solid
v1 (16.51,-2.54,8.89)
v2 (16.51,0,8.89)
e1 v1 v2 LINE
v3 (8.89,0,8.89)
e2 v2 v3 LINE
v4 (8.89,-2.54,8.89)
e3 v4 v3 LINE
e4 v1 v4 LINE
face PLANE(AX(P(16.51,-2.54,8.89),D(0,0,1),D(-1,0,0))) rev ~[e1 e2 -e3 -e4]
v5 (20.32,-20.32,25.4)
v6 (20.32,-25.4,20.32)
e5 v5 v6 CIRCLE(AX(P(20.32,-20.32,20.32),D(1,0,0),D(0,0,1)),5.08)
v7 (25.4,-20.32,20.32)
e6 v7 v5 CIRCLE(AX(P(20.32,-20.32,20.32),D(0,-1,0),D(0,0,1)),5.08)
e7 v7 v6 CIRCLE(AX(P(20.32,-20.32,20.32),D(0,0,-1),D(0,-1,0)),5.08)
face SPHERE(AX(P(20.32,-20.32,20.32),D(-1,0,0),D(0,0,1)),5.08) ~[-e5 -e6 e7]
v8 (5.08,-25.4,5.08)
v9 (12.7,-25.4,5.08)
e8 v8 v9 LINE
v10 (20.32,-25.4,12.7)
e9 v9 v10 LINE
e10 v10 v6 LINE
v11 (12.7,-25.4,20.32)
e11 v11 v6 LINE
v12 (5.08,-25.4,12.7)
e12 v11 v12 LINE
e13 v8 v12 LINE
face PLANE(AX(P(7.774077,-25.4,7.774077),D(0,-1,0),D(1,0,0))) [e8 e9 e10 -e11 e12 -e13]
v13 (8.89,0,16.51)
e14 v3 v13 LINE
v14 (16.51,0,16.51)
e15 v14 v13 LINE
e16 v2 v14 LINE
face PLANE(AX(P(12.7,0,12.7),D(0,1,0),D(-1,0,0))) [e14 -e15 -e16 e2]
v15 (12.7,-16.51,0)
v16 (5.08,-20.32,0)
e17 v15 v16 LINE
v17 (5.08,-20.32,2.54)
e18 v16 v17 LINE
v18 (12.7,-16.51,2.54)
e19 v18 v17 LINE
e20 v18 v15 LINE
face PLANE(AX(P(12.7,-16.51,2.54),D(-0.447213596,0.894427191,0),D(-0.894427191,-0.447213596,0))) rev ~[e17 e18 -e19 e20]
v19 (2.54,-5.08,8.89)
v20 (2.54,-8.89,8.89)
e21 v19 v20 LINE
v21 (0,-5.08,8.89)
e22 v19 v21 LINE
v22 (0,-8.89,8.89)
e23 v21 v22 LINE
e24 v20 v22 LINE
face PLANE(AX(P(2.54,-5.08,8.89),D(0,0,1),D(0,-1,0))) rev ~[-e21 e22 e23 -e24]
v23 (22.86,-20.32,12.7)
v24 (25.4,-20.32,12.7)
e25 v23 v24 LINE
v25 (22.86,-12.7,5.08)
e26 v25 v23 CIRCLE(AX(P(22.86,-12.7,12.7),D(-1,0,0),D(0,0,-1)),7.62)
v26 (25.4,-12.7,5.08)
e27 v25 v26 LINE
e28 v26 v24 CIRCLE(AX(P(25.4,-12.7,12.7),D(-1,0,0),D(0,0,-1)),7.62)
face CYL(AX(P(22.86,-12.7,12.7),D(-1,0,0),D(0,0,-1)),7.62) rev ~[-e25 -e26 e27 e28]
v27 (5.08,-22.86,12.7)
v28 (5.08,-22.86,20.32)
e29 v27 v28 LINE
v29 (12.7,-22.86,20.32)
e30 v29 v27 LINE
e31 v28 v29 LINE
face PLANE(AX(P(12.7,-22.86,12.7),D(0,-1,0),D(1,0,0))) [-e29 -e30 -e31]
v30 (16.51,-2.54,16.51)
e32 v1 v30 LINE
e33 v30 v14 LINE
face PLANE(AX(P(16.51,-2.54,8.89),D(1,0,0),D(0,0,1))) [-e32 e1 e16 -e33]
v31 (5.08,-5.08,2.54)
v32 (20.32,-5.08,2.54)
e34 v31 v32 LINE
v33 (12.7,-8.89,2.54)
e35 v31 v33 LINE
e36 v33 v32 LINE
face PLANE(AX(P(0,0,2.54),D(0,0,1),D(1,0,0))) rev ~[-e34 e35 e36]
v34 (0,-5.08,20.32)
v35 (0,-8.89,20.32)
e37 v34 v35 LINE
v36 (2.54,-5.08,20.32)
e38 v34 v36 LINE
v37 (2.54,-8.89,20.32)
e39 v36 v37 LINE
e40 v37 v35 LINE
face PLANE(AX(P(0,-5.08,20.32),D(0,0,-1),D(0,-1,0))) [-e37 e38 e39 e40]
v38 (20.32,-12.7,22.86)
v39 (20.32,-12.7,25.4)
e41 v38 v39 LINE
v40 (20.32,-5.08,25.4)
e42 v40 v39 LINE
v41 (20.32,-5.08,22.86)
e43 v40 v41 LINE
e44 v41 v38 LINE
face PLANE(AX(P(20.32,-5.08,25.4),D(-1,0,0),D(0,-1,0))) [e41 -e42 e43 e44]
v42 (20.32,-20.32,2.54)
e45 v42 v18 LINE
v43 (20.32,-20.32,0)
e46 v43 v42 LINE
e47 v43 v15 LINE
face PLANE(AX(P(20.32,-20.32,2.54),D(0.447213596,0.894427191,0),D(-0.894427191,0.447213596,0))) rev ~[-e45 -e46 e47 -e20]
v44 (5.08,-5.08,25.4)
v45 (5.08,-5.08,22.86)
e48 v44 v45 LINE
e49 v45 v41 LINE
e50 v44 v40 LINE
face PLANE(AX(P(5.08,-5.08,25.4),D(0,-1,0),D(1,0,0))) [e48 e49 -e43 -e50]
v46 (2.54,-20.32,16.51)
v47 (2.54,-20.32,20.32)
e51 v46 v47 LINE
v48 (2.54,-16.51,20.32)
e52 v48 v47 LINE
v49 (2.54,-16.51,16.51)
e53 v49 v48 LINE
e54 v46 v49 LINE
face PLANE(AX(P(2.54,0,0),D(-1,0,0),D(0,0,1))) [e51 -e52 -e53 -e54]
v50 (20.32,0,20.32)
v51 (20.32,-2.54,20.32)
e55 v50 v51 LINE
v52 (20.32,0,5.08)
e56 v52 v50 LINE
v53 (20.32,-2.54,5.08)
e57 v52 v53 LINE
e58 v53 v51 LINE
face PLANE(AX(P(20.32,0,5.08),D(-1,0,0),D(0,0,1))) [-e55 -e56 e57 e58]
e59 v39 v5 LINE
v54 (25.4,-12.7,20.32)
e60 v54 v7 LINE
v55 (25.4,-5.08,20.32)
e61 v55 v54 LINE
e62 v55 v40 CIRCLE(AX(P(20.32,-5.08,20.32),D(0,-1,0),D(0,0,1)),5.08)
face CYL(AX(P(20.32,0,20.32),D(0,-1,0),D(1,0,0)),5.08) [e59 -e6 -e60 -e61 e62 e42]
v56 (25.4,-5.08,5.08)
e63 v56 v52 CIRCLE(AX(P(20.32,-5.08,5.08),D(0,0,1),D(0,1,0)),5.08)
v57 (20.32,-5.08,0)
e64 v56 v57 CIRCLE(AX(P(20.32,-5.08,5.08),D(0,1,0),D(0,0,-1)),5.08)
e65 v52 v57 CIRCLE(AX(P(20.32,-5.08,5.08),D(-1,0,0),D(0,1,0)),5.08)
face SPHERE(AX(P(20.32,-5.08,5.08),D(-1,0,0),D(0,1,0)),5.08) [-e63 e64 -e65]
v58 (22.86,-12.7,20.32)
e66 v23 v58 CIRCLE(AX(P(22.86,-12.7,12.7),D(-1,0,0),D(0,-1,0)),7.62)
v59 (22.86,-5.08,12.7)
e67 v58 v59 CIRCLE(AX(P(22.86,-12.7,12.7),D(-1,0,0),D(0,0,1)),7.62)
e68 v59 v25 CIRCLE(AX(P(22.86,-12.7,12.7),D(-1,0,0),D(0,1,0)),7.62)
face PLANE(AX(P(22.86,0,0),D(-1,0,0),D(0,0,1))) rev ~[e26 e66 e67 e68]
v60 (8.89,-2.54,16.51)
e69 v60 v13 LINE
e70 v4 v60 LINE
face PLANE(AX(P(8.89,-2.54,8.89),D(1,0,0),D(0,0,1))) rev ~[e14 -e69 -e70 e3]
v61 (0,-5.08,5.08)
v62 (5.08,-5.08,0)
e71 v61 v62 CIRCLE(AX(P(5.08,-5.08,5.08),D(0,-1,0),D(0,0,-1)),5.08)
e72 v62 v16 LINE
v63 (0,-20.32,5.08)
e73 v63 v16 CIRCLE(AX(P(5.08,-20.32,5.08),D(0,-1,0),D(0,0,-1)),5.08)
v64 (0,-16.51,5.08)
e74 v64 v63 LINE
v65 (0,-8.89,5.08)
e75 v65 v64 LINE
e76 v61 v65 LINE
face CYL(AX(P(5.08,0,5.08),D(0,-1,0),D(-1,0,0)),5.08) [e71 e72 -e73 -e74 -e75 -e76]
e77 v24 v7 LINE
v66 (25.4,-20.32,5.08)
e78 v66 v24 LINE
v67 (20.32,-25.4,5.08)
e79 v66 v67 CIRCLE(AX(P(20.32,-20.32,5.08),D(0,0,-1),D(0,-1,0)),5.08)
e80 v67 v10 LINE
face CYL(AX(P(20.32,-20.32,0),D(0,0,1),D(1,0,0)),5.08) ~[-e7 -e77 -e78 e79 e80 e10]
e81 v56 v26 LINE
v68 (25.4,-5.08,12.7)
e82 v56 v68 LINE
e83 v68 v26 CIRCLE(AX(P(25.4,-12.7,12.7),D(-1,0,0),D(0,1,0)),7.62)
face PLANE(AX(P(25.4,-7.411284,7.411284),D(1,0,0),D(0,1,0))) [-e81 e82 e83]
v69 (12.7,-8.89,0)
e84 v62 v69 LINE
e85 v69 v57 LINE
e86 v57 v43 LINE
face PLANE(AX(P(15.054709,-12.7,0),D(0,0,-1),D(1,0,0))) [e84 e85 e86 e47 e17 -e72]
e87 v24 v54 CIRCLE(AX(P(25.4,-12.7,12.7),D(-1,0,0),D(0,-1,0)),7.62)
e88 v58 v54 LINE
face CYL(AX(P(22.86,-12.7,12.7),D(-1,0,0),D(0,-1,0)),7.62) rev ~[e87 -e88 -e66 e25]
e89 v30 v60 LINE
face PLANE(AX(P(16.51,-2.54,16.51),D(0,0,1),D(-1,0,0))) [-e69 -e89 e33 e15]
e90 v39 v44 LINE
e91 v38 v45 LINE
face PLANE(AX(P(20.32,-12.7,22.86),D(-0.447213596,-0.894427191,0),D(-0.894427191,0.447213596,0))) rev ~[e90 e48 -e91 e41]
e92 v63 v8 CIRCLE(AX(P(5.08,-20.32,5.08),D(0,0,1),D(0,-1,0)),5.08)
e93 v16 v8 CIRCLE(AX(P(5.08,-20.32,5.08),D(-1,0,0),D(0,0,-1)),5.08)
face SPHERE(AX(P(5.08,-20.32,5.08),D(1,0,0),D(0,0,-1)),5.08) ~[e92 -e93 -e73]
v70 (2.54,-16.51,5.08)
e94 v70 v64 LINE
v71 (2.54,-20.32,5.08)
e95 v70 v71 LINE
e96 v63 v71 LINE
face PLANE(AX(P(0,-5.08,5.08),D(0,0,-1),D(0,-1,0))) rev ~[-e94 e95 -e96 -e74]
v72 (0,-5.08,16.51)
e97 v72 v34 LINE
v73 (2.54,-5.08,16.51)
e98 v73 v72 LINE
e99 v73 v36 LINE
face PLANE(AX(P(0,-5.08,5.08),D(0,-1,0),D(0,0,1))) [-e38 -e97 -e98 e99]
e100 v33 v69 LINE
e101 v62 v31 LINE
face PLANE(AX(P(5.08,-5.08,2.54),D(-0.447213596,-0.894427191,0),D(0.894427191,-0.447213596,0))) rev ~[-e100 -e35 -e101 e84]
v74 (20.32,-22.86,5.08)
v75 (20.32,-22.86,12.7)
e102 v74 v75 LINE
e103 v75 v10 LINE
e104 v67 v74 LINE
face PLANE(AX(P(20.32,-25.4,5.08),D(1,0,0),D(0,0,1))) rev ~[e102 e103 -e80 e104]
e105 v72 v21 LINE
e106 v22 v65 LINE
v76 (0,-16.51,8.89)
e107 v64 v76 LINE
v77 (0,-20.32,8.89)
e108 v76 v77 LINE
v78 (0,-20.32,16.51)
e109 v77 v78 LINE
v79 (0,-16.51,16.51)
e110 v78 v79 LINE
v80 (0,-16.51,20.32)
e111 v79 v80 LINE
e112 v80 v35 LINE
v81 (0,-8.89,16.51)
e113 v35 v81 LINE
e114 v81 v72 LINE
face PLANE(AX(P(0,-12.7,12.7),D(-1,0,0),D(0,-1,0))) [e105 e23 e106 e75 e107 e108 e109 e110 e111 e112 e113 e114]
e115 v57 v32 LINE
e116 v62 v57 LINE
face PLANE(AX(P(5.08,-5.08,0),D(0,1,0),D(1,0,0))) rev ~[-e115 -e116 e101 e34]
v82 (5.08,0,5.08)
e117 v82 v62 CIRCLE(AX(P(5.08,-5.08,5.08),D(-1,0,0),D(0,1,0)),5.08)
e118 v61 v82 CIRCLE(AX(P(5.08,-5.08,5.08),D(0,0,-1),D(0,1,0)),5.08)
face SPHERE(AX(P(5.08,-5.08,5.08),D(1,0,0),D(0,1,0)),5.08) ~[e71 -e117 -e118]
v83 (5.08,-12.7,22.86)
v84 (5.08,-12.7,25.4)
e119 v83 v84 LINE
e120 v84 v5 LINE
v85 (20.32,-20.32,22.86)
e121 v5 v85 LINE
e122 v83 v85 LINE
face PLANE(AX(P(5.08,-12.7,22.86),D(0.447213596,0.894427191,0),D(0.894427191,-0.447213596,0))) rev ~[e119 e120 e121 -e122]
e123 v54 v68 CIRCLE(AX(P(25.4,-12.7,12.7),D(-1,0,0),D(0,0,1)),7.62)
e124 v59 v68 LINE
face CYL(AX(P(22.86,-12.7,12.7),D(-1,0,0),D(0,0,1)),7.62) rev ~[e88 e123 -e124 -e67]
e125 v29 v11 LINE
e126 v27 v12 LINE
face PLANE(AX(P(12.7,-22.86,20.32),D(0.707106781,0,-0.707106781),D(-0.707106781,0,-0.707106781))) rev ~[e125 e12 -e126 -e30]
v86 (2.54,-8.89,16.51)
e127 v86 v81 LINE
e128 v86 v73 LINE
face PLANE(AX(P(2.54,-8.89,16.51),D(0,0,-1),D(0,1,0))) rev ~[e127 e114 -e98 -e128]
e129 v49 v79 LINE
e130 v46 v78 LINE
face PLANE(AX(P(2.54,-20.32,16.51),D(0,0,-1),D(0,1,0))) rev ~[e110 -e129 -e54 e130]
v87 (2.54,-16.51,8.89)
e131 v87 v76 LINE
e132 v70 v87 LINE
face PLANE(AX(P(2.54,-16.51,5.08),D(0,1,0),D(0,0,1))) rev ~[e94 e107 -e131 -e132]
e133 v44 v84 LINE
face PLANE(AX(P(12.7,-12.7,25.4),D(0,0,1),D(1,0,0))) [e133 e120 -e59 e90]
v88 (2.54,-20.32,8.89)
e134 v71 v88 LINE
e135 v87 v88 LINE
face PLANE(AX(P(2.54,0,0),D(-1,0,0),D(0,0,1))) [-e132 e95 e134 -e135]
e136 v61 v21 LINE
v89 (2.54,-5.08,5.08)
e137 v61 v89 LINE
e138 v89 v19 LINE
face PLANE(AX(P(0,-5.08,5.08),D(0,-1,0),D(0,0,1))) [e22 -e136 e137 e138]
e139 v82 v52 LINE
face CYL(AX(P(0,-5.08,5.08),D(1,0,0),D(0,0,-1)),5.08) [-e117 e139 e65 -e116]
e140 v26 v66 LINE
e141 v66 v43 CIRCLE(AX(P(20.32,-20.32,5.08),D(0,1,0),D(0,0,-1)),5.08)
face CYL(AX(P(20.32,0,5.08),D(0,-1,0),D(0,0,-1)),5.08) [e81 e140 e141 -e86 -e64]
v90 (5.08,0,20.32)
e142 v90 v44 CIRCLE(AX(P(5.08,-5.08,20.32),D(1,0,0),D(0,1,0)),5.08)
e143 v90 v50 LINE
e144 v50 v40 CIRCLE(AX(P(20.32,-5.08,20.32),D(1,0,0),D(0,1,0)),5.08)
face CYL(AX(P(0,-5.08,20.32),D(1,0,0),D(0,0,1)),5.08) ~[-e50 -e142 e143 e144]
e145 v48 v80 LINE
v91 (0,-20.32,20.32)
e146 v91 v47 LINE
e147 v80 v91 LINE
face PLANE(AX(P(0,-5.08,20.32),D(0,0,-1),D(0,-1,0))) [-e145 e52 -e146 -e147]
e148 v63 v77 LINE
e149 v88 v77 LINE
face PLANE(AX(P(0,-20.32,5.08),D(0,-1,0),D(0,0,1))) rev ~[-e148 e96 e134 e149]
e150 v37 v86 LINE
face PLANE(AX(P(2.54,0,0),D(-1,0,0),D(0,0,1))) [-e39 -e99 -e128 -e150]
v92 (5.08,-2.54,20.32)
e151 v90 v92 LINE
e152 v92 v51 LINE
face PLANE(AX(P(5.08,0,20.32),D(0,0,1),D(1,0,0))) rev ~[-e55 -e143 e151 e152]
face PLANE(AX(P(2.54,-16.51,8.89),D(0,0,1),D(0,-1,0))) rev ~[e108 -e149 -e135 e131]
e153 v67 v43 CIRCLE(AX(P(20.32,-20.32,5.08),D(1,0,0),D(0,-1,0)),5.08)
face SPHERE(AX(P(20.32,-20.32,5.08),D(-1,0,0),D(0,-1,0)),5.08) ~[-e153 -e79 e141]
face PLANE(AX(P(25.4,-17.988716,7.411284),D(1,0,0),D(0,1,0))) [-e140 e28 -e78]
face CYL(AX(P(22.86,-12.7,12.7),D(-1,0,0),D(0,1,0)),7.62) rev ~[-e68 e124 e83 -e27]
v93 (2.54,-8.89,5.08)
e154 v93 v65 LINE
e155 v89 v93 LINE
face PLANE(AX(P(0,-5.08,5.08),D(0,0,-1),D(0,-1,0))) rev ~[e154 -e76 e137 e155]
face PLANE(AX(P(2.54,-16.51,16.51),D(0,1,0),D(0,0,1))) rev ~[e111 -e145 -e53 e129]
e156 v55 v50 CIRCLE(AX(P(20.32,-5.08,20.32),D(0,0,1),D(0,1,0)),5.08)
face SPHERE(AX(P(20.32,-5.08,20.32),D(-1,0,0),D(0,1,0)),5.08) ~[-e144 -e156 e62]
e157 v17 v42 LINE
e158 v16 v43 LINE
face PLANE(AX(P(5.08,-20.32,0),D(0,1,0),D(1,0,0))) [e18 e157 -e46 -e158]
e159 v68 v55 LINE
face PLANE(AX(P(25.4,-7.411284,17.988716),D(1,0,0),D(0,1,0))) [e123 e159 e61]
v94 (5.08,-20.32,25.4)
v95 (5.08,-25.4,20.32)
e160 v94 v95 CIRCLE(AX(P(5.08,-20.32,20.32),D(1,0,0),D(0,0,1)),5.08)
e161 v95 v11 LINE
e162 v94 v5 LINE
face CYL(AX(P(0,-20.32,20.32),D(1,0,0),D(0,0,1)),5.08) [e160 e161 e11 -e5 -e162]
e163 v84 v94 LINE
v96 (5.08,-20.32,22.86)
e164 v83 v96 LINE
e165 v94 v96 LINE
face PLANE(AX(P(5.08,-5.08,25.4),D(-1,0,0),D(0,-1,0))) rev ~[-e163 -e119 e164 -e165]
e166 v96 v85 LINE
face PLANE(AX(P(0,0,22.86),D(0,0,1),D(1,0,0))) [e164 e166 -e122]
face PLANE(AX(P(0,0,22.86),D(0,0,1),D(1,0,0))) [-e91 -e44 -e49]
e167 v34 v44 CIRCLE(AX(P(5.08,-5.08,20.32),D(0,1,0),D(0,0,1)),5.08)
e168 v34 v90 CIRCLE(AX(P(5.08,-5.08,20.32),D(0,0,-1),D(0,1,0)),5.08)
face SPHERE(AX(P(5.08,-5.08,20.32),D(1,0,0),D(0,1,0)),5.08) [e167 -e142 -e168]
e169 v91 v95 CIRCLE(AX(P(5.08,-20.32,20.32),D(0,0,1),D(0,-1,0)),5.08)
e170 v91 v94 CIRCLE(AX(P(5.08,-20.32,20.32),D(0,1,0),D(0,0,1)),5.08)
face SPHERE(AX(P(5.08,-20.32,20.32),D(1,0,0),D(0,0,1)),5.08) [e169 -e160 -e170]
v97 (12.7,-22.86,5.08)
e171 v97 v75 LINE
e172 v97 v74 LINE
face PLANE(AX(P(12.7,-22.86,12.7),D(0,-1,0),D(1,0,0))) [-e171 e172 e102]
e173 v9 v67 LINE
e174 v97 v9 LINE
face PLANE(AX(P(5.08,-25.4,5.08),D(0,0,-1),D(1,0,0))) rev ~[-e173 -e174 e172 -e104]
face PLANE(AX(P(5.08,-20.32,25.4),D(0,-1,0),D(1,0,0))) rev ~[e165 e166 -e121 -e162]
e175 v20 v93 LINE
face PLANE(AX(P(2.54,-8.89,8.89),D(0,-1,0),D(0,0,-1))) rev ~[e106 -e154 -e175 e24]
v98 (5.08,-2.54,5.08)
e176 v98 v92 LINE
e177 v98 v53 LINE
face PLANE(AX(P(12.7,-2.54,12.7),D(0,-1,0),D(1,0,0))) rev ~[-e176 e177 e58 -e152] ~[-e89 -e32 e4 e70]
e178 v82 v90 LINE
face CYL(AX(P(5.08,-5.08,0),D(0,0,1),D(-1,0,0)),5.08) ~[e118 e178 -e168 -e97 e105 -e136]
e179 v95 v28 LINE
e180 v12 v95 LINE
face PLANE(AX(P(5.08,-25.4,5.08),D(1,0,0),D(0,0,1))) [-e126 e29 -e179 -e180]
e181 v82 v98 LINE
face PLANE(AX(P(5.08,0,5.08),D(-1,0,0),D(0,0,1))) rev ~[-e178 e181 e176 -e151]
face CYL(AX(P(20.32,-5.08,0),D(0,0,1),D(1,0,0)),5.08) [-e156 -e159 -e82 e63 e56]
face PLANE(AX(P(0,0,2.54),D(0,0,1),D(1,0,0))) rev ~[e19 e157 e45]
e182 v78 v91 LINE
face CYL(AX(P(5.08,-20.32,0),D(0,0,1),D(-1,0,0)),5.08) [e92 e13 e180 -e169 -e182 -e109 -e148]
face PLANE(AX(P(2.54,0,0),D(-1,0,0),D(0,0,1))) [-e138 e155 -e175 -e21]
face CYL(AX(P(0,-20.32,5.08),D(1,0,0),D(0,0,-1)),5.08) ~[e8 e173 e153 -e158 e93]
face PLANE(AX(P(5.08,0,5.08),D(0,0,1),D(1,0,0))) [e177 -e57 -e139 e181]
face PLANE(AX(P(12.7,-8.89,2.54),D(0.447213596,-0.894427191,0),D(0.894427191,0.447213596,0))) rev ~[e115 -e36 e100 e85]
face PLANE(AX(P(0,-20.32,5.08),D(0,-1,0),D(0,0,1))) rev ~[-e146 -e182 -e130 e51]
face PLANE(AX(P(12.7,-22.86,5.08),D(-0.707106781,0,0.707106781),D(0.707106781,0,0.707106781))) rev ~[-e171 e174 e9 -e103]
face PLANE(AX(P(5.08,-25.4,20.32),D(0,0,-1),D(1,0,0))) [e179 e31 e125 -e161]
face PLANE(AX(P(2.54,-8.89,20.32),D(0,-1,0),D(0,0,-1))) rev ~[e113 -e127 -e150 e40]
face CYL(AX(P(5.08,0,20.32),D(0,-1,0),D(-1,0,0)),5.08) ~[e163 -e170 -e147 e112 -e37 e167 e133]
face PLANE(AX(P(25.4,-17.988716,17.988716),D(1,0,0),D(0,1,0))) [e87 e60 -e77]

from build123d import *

# Parameters (mm, degrees)
F0_W      = 25.4
F0_H      = 25.4
F1_DEPTH  = 25.4
F2_R      = 5.08
F3_DEPTH  = 2.54
F4_DEPTH  = 2.54
F5_DEPTH  = 2.54
F6_DEPTH  = 2.54
F7_DEPTH  = 2.54
F8_DEPTH  = 2.54
F15_DEPTH = 2.54
F11_W     = 7.62
F11_H     = 7.62
F16_DEPTH = 2.54
F17_DEPTH = 2.54
F18_DEPTH = 2.54
F19_DEPTH = 2.54
F20_DEPTH = 2.54


with BuildPart() as f1:
    # F0 (on Front) → F1 (new body)
    with BuildSketch(Plane.XZ):
        with Locations((12.7, 12.7)):
            Rectangle(F0_W, F0_H)
    extrude(amount=F1_DEPTH)

    # F2
    f2_edges = [f1.edges().sort_by_distance(p)[0] for p in [
        (12.7, -25.4, 25.4),
        (12.7, -25.4, 0),
        (12.7, 0, 25.4),
        (12.7, 0, 0),
        (25.4, 0, 12.7),
        (0, 0, 12.7),
        (0, -12.7, 25.4),
        (0, -12.7, 0),
        (25.4, -12.7, 25.4),
        (25.4, -25.4, 12.7),
        (0, -25.4, 12.7),
        (25.4, -12.7, 0),
    ]]
    fillet(f2_edges, radius=F2_R)

    # F3 (cut): a face of the model
    f3_faces = [f1.faces().sort_by_distance(p)[0] for p in [
        (12.7, -25.4, 12.7),
    ]]
    extrude(f3_faces, amount=-F3_DEPTH, mode=Mode.SUBTRACT)

    # F4 (cut): a face of the model
    f4_faces = [f1.faces().sort_by_distance(p)[0] for p in [
        (0, -12.7, 12.7),
    ]]
    extrude(f4_faces, amount=-F4_DEPTH, mode=Mode.SUBTRACT)

    # F5 (cut): a face of the model
    f5_faces = [f1.faces().sort_by_distance(p)[0] for p in [
        (12.7, -12.7, 25.4),
    ]]
    extrude(f5_faces, amount=-F5_DEPTH, mode=Mode.SUBTRACT)

    # F6 (cut): a face of the model
    f6_faces = [f1.faces().sort_by_distance(p)[0] for p in [
        (25.4, -12.7, 12.7),
    ]]
    extrude(f6_faces, amount=-F6_DEPTH, mode=Mode.SUBTRACT)

    # F7 (cut): a face of the model
    f7_faces = [f1.faces().sort_by_distance(p)[0] for p in [
        (12.7, -12.7, 0),
    ]]
    extrude(f7_faces, amount=-F7_DEPTH, mode=Mode.SUBTRACT)

    # F8 (cut): a face of the model
    f8_faces = [f1.faces().sort_by_distance(p)[0] for p in [
        (12.7, 0, 12.7),
    ]]
    extrude(f8_faces, amount=-F8_DEPTH, mode=Mode.SUBTRACT)

    # F14 (on face) → F15 (join)
    with BuildSketch(Plane.XY.offset(22.86)):
        Polygon((20.32, -20.32), (20.32, -12.7), (5.08, -5.08), (5.08, -12.7), align=None)
    extrude(amount=F15_DEPTH)

    # F11 (on face) → F16 (join)
    with BuildSketch(Plane(origin=(0, -2.54, 0), x_dir=(-1, 0, 0), z_dir=(0, 1, 0))):
        with Locations((-12.7, 12.7)):
            Rectangle(F11_W, F11_H)
    extrude(amount=F16_DEPTH)

    # F9 (on face) → F17 (join)
    with BuildSketch(Plane.XZ.offset(22.86)):
        Polygon((12.7, 5.08), (5.08, 12.7), (5.08, 5.08), align=None)
        Polygon((12.7, 20.32), (5.08, 12.7), (12.7, 5.08), (20.32, 12.7), align=None)
        Polygon((20.32, 20.32), (12.7, 20.32), (20.32, 12.7), align=None)
    extrude(amount=F17_DEPTH)

    # F12 (on face) → F18 (join)
    with BuildSketch(Plane(origin=(2.54, 0, 0), x_dir=(0, -1, 0), z_dir=(-1, 0, 0))):
        Polygon((16.51, 20.32), (12.7, 20.32), (8.89, 20.32), (8.89, 16.51), (5.08, 16.51), (5.08, 12.7), (5.08, 8.89), (8.89, 8.89), (8.89, 5.08), (12.7, 5.08), (16.51, 5.08), (16.51, 8.89), (20.32, 8.89), (20.32, 12.7), (20.32, 16.51), (16.51, 16.51), align=None)
    extrude(amount=F18_DEPTH)

    # F13 (on face) → F19 (join)
    with BuildSketch(Plane(origin=(0, 0, 2.54), x_dir=(1, 0, 0), z_dir=(0, 0, -1))):
        Polygon((12.7, 8.89), (20.32, 5.08), (20.32, 20.32), (12.7, 16.51), (5.08, 12.7), align=None)
        Polygon((5.08, 5.08), (12.7, 8.89), (5.08, 12.7), align=None)
        Polygon((5.08, 20.32), (5.08, 12.7), (12.7, 16.51), align=None)
    extrude(amount=F19_DEPTH)

    # F10 (on face) → F20 (join)
    with BuildSketch(Plane.YZ.offset(22.86)):
        with BuildLine():
            Line((-5.08, 5.08), (-5.08, 12.7))
            ThreePointArc((-5.08, 12.7), (-7.3118463274, 7.3118463274), (-12.7, 5.08))
            Line((-12.7, 5.08), (-5.08, 5.08))
        make_face()
        with BuildLine():
            ThreePointArc((-12.7, 20.32), (-7.3118463274, 18.0881536726), (-5.08, 12.7))
            Line((-5.08, 12.7), (-5.08, 20.32))
            Line((-5.08, 20.32), (-12.7, 20.32))
        make_face()
        with BuildLine():
            ThreePointArc((-20.32, 12.7), (-18.0881536726, 18.0881536726), (-12.7, 20.32))
            Line((-12.7, 20.32), (-20.32, 20.32))
            Line((-20.32, 20.32), (-20.32, 12.7))
        make_face()
        with BuildLine():
            Line((-20.32, 5.08), (-12.7, 5.08))
            ThreePointArc((-12.7, 5.08), (-18.0881536726, 7.3118463274), (-20.32, 12.7))
            Line((-20.32, 12.7), (-20.32, 5.08))
        make_face()
    extrude(amount=F20_DEPTH)


solid = f1.part
